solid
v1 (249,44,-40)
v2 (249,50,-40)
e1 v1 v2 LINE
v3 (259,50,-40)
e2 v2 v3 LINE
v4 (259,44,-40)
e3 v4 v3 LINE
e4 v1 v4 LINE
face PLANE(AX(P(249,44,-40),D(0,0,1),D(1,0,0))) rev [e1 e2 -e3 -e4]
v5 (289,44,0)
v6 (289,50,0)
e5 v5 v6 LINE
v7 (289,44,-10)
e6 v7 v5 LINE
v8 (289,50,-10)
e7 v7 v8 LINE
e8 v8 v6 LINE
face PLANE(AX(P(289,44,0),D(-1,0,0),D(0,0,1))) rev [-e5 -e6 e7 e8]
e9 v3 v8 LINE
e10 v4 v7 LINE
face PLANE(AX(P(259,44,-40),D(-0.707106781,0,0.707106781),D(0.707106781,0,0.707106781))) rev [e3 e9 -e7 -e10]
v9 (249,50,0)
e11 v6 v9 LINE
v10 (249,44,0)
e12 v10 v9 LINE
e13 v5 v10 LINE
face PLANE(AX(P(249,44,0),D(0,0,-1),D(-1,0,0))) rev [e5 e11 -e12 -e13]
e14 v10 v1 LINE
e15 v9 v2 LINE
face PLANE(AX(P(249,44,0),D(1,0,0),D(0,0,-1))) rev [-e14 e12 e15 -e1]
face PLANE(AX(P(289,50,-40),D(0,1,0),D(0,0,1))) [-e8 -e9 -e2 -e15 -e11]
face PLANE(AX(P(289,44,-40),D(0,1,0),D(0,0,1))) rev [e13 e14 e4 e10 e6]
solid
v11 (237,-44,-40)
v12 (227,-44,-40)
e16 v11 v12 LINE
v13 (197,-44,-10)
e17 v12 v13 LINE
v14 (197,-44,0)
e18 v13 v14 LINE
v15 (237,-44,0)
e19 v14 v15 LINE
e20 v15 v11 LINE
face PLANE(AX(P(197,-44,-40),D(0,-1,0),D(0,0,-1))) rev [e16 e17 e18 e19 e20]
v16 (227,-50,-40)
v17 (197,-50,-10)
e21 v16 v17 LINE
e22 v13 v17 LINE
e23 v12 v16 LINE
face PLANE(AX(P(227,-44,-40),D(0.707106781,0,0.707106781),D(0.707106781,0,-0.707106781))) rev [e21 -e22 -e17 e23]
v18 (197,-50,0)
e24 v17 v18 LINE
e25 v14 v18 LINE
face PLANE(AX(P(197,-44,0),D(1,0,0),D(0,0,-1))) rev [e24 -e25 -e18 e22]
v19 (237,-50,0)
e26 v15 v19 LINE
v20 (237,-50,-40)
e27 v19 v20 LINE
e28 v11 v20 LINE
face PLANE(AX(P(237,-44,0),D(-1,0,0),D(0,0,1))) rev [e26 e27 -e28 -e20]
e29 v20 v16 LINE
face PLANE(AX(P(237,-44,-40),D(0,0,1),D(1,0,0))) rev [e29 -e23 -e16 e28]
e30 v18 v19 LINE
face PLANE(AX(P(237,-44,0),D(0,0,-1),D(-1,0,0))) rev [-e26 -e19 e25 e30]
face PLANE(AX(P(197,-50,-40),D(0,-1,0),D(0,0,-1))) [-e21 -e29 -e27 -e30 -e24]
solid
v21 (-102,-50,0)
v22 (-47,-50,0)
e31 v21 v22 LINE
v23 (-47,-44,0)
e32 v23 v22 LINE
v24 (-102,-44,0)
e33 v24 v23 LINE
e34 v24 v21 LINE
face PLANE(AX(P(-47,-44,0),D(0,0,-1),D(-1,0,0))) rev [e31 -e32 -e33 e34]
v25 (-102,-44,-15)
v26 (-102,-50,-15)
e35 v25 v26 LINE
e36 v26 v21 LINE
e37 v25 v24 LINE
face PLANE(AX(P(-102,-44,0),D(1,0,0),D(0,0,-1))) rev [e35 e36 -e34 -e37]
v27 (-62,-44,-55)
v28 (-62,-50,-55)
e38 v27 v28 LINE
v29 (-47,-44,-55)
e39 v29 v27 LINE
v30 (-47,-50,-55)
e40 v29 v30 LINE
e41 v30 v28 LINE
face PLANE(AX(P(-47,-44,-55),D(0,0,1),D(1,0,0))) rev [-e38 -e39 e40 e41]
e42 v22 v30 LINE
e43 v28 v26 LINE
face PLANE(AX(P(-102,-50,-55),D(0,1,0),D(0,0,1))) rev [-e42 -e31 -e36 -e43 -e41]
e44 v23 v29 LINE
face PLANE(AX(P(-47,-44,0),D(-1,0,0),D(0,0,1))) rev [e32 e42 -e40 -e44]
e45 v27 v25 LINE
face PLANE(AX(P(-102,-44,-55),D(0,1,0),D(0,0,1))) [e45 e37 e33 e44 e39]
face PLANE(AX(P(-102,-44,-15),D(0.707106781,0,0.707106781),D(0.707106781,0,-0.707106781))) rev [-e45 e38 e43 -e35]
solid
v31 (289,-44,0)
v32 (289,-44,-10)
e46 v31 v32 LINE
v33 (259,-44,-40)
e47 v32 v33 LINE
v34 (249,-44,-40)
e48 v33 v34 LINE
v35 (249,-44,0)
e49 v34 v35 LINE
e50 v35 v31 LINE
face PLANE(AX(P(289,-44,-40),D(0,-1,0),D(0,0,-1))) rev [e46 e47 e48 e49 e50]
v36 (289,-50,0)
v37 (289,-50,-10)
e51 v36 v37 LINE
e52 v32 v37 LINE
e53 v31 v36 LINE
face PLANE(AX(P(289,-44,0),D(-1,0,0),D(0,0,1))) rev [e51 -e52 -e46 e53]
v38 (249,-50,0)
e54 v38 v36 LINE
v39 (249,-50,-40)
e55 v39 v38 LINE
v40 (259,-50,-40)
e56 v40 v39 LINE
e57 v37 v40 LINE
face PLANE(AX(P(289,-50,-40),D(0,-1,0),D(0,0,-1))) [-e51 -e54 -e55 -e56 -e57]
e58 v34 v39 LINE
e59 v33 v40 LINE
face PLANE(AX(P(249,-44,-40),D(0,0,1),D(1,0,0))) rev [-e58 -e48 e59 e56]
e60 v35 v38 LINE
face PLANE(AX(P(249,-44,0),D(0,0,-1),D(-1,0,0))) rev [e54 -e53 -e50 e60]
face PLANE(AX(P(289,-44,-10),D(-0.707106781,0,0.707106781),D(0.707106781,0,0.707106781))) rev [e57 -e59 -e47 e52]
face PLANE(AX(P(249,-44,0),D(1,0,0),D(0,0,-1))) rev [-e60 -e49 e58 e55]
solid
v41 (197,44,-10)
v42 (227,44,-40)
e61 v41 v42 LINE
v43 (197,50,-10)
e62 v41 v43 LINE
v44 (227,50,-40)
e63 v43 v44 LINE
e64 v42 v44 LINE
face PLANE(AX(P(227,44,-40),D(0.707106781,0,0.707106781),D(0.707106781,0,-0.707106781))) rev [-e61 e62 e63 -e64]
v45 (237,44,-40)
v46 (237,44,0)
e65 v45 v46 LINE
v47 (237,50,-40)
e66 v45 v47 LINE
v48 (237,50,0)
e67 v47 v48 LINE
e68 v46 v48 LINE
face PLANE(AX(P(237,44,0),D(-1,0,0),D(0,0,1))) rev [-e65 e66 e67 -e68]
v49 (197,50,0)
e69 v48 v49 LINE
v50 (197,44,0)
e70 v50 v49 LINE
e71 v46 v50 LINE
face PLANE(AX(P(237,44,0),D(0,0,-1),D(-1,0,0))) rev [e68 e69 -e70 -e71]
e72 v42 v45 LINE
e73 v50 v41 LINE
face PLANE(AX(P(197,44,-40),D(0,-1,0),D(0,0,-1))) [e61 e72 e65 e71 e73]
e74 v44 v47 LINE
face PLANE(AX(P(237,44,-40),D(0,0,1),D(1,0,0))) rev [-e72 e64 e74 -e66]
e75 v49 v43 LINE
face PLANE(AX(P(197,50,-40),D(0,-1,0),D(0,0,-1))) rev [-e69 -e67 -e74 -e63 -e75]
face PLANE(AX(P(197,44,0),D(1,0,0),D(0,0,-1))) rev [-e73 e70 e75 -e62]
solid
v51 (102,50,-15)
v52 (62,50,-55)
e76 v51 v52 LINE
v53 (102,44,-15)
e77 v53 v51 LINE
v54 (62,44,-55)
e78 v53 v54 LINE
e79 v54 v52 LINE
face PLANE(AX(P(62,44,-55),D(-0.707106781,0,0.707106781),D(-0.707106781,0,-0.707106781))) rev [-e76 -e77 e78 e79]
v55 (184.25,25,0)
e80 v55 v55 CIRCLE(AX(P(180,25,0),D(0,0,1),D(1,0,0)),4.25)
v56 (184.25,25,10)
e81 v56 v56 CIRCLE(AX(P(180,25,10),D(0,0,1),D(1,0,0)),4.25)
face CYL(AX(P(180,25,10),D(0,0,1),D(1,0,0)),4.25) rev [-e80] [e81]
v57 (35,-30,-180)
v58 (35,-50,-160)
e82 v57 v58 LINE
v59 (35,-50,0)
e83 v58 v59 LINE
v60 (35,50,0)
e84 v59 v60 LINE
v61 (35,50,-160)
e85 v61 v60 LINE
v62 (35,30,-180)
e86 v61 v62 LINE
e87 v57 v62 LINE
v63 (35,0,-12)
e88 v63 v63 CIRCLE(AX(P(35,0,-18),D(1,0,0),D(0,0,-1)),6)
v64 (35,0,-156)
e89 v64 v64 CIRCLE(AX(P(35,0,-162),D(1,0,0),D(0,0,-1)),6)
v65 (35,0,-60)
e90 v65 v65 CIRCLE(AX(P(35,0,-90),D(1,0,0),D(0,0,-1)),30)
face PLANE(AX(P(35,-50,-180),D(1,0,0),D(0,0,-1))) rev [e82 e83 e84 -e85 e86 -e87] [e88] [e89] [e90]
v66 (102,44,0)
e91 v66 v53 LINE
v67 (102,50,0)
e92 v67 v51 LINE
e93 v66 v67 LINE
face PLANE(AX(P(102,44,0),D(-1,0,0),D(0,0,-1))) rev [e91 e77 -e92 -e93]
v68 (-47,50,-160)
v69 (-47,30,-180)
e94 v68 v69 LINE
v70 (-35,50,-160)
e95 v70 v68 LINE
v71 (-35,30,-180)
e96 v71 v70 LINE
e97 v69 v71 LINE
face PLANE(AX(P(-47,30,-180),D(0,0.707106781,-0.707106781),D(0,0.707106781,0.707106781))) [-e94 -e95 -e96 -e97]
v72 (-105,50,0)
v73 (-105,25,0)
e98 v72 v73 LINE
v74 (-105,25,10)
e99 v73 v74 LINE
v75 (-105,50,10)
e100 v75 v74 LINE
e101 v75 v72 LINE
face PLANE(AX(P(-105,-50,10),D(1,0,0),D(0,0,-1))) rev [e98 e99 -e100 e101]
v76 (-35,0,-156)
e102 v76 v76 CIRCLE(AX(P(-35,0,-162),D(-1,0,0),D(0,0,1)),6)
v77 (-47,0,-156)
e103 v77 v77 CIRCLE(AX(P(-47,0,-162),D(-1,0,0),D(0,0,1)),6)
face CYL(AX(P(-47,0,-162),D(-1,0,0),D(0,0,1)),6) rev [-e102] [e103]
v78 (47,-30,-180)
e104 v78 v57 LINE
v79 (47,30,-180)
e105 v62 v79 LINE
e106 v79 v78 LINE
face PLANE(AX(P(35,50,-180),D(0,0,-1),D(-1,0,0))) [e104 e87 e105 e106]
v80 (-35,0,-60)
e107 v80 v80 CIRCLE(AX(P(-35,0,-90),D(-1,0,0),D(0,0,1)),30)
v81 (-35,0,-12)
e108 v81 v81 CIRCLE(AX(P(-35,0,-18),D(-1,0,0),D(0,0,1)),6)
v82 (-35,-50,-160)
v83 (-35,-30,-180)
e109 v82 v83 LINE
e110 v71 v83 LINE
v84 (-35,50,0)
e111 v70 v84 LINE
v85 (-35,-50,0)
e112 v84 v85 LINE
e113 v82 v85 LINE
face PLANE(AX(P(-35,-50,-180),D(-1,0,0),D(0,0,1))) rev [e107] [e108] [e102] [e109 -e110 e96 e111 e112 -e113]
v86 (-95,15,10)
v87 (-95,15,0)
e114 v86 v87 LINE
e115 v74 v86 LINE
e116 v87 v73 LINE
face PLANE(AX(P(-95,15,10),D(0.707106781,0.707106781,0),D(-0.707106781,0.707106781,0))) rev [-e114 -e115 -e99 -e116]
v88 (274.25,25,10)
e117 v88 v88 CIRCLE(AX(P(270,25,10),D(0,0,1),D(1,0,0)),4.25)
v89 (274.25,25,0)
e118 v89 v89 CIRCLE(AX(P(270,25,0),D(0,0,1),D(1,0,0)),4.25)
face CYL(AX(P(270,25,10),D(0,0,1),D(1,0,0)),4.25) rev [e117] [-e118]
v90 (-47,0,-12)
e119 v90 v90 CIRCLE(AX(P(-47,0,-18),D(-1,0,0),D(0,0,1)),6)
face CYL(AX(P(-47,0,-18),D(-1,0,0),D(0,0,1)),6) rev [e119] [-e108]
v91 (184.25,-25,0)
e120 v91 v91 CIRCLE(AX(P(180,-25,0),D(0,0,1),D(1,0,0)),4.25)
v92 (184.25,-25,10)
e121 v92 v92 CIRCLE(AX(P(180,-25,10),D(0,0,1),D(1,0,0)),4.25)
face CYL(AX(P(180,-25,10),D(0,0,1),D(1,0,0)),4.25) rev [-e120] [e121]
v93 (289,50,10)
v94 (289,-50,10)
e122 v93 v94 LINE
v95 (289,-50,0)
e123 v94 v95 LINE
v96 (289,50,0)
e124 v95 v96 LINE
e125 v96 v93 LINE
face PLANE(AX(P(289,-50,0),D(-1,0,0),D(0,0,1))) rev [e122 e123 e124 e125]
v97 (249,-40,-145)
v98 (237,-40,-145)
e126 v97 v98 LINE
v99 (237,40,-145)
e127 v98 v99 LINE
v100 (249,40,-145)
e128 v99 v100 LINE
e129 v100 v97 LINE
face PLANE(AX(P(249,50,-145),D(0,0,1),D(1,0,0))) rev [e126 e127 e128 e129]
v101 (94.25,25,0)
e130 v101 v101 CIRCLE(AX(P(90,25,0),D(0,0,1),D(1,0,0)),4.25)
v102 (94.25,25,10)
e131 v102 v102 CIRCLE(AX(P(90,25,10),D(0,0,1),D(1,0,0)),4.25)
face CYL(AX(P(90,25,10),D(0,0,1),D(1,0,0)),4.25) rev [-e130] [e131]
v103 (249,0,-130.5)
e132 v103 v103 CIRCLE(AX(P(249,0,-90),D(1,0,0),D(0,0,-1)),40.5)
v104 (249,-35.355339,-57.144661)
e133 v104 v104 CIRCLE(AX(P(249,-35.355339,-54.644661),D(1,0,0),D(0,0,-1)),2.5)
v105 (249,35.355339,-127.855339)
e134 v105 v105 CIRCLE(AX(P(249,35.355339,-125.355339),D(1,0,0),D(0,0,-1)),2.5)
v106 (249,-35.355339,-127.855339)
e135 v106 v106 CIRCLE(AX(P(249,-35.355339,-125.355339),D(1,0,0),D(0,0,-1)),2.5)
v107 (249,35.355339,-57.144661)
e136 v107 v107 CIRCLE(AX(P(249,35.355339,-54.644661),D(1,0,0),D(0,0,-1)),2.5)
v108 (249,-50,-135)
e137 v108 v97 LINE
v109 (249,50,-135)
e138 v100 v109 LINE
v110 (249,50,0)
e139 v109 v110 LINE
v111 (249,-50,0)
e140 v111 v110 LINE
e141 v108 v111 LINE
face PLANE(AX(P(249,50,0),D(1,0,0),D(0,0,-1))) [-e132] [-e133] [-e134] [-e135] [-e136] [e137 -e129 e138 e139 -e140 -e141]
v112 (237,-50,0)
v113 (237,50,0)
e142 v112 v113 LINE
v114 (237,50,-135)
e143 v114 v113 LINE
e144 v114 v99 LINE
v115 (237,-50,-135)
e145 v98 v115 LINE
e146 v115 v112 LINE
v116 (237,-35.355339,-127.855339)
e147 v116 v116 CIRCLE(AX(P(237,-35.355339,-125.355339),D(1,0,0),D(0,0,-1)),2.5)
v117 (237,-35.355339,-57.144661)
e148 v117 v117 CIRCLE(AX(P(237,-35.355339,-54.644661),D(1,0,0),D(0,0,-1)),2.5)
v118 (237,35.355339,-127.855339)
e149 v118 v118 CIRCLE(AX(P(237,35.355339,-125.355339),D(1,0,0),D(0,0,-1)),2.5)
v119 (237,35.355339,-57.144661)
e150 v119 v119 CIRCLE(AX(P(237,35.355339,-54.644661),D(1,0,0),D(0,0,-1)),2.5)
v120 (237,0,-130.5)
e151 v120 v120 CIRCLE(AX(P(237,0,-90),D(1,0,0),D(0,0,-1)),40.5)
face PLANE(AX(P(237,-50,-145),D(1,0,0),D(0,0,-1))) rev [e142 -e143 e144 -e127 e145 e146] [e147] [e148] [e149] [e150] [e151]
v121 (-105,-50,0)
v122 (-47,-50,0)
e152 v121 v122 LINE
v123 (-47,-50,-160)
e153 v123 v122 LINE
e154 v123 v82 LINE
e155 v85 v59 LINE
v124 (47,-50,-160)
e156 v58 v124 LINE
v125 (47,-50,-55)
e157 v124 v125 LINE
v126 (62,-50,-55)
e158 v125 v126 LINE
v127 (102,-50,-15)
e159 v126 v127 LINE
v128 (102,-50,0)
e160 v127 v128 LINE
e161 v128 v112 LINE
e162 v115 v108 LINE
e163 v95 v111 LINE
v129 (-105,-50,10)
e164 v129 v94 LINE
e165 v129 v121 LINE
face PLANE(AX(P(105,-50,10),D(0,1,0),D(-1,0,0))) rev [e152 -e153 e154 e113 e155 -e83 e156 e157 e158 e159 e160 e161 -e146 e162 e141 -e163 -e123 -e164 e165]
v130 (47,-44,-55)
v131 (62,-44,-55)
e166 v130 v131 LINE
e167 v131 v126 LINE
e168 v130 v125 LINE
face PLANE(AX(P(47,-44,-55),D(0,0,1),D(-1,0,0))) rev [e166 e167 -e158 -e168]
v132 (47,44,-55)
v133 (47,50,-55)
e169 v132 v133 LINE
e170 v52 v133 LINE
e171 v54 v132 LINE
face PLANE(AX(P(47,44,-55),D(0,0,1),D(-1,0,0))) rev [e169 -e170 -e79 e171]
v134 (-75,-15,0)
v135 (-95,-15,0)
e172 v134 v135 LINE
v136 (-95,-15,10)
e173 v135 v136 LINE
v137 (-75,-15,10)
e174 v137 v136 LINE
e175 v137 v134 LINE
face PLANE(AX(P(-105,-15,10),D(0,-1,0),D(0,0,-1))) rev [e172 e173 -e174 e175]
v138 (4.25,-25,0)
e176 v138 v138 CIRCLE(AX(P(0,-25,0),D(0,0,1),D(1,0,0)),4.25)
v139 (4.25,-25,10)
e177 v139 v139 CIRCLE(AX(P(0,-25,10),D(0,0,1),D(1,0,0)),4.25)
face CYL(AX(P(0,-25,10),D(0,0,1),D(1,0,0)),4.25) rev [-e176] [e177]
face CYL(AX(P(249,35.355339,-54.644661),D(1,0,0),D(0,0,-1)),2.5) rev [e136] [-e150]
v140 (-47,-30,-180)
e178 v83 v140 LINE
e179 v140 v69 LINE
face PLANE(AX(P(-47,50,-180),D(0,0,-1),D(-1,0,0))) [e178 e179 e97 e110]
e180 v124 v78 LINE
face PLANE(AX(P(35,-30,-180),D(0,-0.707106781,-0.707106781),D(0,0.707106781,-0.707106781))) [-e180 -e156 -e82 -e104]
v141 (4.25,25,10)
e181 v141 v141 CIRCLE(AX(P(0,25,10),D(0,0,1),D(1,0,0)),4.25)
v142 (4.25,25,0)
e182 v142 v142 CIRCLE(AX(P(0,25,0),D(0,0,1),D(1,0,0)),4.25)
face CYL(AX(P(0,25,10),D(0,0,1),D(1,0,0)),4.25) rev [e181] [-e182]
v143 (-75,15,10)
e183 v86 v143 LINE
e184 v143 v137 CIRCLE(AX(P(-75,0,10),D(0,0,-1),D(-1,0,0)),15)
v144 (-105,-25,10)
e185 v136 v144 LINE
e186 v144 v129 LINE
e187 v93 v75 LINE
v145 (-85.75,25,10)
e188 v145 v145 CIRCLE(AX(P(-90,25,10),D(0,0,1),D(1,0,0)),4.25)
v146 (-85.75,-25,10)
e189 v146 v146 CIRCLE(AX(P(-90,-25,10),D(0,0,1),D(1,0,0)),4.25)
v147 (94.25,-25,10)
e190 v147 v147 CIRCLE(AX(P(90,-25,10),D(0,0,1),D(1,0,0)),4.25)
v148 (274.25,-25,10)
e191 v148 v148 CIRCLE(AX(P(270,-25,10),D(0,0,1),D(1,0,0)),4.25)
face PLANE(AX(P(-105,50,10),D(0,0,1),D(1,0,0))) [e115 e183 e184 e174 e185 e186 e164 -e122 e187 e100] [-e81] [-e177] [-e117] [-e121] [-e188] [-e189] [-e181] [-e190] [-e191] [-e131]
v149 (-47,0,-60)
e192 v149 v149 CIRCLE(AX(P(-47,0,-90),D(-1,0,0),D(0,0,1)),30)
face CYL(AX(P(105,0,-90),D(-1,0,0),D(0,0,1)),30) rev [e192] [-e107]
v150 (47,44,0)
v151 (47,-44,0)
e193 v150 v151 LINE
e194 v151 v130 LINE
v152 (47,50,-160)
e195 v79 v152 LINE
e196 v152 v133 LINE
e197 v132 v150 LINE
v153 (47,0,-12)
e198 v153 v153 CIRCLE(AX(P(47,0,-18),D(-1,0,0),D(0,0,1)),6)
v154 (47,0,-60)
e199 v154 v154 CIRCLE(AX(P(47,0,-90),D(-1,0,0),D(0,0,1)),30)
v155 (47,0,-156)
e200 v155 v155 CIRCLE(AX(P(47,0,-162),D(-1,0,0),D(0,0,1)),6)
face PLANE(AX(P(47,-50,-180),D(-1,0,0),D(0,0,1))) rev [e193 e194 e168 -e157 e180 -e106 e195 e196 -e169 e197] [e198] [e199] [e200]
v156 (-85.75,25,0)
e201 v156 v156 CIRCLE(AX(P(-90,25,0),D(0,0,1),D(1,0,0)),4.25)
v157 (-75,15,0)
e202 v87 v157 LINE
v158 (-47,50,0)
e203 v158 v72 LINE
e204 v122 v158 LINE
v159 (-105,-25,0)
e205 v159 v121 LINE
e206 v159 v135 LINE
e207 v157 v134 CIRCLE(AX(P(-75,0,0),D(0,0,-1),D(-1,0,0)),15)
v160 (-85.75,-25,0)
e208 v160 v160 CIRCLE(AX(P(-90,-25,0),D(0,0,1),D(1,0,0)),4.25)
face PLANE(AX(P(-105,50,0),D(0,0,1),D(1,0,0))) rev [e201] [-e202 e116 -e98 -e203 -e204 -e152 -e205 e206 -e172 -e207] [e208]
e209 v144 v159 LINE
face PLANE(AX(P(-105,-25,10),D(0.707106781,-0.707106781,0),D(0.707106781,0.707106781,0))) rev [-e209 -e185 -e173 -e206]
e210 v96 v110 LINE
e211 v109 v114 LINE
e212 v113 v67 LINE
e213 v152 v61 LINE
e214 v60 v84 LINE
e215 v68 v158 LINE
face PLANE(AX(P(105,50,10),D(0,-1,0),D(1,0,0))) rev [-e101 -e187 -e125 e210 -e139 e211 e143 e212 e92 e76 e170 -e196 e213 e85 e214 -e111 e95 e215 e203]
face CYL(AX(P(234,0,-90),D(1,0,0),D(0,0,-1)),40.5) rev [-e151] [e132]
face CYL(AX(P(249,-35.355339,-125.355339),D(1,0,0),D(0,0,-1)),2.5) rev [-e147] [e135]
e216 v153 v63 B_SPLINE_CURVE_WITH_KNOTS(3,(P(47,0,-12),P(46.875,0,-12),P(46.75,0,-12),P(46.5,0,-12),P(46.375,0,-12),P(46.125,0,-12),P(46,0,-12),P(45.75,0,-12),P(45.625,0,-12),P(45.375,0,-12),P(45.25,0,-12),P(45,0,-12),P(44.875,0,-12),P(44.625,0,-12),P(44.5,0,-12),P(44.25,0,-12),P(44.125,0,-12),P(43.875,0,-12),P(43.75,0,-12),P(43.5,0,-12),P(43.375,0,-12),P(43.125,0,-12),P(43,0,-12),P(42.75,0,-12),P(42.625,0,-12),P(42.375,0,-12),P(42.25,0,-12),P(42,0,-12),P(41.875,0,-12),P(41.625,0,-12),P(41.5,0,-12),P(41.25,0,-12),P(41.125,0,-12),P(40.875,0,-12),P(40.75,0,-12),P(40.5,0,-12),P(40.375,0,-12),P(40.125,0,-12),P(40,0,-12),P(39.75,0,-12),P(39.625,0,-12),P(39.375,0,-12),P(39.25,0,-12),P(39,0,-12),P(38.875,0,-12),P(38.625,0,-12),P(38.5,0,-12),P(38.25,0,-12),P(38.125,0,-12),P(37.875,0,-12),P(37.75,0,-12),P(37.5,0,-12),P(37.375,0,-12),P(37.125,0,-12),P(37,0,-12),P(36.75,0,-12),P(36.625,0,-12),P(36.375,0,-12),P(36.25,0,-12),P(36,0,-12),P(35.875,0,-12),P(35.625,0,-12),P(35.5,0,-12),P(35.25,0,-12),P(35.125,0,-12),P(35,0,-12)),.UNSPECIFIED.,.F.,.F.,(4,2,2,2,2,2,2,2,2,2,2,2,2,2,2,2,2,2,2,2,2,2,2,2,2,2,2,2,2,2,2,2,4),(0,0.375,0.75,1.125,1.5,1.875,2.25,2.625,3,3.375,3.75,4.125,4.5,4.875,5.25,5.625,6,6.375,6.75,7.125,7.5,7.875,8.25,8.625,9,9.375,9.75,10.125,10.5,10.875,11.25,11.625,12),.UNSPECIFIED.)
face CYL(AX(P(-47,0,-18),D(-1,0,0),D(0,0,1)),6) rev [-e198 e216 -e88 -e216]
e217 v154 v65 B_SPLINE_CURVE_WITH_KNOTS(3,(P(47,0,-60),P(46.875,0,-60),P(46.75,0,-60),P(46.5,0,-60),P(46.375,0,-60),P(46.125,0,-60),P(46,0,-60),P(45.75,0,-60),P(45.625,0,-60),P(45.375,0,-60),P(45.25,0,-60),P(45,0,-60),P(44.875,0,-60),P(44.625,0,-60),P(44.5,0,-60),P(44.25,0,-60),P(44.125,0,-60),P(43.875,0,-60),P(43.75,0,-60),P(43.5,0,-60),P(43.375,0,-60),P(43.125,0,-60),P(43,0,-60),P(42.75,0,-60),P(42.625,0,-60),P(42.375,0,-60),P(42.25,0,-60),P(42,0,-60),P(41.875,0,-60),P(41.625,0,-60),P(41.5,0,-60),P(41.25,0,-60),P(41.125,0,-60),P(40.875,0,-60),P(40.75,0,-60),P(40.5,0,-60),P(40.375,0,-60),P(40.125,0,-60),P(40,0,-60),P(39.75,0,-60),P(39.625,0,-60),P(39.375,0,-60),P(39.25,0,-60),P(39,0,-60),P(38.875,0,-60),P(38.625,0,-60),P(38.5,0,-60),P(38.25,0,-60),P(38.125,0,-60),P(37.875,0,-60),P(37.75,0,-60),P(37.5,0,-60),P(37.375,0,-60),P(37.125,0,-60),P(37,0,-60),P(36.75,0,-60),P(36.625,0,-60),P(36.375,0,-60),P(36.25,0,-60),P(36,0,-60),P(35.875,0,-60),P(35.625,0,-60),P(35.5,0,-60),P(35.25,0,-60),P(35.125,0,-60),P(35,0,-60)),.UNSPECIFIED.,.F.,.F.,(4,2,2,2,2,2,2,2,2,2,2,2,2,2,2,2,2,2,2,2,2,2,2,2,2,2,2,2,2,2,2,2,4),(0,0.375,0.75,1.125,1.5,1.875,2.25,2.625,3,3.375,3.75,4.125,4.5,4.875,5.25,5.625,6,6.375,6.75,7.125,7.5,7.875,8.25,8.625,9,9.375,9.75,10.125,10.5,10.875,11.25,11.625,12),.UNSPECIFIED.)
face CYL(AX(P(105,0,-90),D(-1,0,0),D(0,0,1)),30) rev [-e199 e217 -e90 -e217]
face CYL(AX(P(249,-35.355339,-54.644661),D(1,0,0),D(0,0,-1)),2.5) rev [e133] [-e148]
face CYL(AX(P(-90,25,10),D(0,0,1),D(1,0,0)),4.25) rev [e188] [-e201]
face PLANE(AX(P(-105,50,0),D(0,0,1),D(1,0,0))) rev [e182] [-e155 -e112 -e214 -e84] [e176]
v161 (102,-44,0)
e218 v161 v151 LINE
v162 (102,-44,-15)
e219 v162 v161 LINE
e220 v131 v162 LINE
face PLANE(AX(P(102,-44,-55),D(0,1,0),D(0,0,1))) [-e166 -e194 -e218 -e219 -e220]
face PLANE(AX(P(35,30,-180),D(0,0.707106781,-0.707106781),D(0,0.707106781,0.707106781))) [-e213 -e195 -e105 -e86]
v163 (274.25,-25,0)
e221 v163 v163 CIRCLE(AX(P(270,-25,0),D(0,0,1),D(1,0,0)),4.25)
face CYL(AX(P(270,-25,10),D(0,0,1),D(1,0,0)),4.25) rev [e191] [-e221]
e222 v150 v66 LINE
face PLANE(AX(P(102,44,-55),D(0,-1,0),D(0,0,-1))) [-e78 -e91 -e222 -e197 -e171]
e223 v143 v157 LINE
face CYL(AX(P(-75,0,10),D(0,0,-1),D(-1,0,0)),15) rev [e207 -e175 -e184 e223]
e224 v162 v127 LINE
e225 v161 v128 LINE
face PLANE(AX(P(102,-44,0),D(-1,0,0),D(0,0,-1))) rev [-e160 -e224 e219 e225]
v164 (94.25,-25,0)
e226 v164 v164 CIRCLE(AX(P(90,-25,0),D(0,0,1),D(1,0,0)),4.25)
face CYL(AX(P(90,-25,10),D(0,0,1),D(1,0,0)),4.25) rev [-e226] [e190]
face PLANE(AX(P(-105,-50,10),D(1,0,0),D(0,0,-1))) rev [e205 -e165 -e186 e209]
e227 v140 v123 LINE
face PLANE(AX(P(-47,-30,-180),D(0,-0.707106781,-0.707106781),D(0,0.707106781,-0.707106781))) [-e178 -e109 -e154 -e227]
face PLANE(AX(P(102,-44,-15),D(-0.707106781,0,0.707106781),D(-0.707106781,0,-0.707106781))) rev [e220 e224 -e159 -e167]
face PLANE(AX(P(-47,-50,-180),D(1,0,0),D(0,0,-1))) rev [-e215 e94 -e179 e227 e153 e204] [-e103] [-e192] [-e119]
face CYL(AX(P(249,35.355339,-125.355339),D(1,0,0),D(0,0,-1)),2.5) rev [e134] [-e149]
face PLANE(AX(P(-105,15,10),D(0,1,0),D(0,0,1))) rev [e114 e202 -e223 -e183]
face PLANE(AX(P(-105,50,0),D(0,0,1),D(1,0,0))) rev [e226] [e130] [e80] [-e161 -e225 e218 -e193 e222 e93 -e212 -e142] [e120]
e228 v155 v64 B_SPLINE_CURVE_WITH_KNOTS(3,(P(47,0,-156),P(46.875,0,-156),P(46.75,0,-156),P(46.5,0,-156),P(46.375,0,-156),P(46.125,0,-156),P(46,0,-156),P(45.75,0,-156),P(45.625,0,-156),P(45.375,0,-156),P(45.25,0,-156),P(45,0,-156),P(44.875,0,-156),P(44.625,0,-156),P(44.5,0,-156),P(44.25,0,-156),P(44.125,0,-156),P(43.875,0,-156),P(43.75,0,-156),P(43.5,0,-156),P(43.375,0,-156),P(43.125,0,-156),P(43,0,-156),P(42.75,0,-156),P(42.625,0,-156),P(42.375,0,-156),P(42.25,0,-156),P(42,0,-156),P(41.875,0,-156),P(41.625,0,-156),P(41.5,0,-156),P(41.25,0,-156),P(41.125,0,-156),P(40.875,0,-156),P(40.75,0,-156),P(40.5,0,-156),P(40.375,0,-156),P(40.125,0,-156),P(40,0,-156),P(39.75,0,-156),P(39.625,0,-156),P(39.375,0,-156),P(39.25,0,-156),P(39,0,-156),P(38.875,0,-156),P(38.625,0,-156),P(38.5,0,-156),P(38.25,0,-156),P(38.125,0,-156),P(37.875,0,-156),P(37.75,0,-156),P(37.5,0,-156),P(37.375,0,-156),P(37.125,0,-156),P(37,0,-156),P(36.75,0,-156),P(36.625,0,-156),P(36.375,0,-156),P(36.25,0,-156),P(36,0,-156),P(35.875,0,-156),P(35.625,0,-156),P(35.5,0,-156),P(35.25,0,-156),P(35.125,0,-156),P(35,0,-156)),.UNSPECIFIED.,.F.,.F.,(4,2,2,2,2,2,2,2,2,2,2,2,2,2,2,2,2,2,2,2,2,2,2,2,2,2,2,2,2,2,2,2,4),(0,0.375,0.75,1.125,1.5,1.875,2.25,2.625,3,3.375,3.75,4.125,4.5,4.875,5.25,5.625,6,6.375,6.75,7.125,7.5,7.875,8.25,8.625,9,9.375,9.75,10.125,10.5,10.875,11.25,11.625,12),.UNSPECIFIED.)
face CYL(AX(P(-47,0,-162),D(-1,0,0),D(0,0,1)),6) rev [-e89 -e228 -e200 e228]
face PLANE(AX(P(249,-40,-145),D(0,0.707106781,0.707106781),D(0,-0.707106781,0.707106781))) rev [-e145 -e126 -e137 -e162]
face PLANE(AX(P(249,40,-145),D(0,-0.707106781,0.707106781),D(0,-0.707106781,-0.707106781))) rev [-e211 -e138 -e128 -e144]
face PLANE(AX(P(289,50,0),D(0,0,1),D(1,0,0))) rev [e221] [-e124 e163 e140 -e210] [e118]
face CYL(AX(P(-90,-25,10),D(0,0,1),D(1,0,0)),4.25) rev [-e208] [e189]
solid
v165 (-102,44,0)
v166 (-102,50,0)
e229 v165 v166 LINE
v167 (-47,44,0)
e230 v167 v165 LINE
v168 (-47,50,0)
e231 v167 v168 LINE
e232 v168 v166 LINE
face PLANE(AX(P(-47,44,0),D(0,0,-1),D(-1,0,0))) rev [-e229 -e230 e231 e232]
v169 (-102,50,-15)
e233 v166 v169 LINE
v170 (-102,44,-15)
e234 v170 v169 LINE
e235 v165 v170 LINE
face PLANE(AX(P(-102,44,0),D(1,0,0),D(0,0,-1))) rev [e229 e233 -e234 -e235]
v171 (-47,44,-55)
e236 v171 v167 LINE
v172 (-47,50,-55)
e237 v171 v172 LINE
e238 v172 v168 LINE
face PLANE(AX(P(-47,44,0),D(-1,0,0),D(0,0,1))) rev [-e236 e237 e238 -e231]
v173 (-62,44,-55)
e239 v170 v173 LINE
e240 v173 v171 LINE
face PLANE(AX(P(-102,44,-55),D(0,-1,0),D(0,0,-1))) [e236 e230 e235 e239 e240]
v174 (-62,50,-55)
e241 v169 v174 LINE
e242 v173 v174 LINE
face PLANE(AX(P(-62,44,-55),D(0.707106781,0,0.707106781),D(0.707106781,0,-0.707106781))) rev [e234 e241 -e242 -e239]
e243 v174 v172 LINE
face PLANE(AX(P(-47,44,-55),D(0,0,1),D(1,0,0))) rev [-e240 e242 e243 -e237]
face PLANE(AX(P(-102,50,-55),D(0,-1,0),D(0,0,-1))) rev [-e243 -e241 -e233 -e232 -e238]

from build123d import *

# Parameters (mm, degrees)
SKETCH_1_W                   = 210
SKETCH_1_H                   = 100
EXTRUDE_1_DEPTH              = 10
SKETCH_2_W                   = 12
SKETCH_2_H                   = 100
EXTRUDE_2_DEPTH              = 180
HOLE_WIZARD_M10_1_D          = 8.5
HOLE_WIZARD_M10_1_DEPTH      = 24.5
HOLE_WIZARD_M10_1_TIP        = 2.553657631
SKETCH_6_R                   = 30
CUT_EXTRUDE_1_DEPTH          = 241.840195981
HOLE_WIZARD_M14_1_D          = 12
GUSSET_START                 = -50
GUSSET_1_DEPTH               = 6
GUSSET_START_2               = 44
GUSSET_2_DEPTH               = 6
CHAMFER_1_SIZE               = 20
SKETCH_11_W                  = 144
SKETCH_11_H                  = 100
EXTRUDE_3_DEPTH              = 10
SKETCH_12_W                  = 12
SKETCH_12_H                  = 100
EXTRUDE_4_DEPTH              = 145
SKETCH_14_R                  = 40.5
CUT_EXTRUDE_2_DEPTH          = 15
HOLE_WIZARD_M6_1_AT_2_COUNT  = 2
HOLE_WIZARD_M6_1_AT_2_PITCH  = 70.710678119
HOLE_WIZARD_M6_1_AT_3_COUNT  = 2
HOLE_WIZARD_M6_1_AT_3_PITCH  = 100
HOLE_WIZARD_M6_1_AT_4_COUNT  = 2
HOLE_WIZARD_M6_1_AT_4_PITCH  = 70.710678119
CHAMFER_2_SIZE               = 10
GUSSET_3_DEPTH               = 6
GUSSET_4_DEPTH               = 6
SKETCH_22_W                  = 10
SKETCH_22_H                  = 100
EXTRUDE_5_DEPTH              = 40
HOLE_WIZARD_M10_2_AT_2_COUNT = 2
HOLE_WIZARD_M10_2_AT_2_PITCH = 50
HOLE_WIZARD_M10_2_AT_3_COUNT = 2
HOLE_WIZARD_M10_2_AT_3_PITCH = 90
HOLE_WIZARD_M10_2_AT_4_COUNT = 2
HOLE_WIZARD_M10_2_AT_4_PITCH = 102.95630141
GUSSET_5_DEPTH               = 6
GUSSET_6_DEPTH               = 6
CUT_EXTRUDE_3_DEPTH          = 345.123524334
CHAMFER_3_SIZE               = 10


# Read off the part's stored shape, not the designer's step: 角撑板1, 角撑板2, 角撑板3, 角撑板4, 角撑板5, 角撑板6
with BuildPart() as part:
    # 草图1 → 凸台-拉伸1 (new body)
    with BuildSketch(Plane.XY):
        Rectangle(SKETCH_1_W, SKETCH_1_H)
    extrude(amount=EXTRUDE_1_DEPTH)

    # 草图2 → 凸台-拉伸2 (add)
    with BuildSketch(Plane(origin=(0, 0, 0), x_dir=(-1, 0, 0), z_dir=(0, 0, -1))):
        with Locations((41, 0)):
            Rectangle(SKETCH_2_W, SKETCH_2_H)
        with Locations((-41, 0)):
            Rectangle(SKETCH_2_W, SKETCH_2_H)
    extrude(amount=EXTRUDE_2_DEPTH)

    # M10 螺纹孔1
    with Locations(Plane.XY.offset(10)):
        with Locations((90, -25), (90, 25), (-90, -25), (-90, 25), (0, -25), (0, 25)):
            Hole(HOLE_WIZARD_M10_1_D / 2, depth=HOLE_WIZARD_M10_1_DEPTH)
            with Locations((0, 0, -(HOLE_WIZARD_M10_1_DEPTH + HOLE_WIZARD_M10_1_TIP / 2))):  # 118° drill point
                Cone(0, HOLE_WIZARD_M10_1_D / 2, HOLE_WIZARD_M10_1_TIP, mode=Mode.SUBTRACT)

    # 草图6 → 切除-拉伸1 (cut, through all)
    with BuildSketch(Plane.ZY.offset(47)):
        with Locations((-90, 0)):
            Circle(SKETCH_6_R)
    extrude(amount=-CUT_EXTRUDE_1_DEPTH, mode=Mode.SUBTRACT)

    # M14 螺纹孔1 (through all)
    with Locations(Plane.ZY.offset(47)):
        with Locations((-162, 0), (-18, 0)):
            Hole(HOLE_WIZARD_M14_1_D / 2)


with BuildPart() as body_2:
    # Gusset 1 outline → Gusset 1 (new body)
    with BuildSketch(Plane(origin=(0, 0, 0), x_dir=(1, 0, 0), z_dir=(0, 1, 0)).offset(GUSSET_START)):
        Polygon((-102, 15), (-102, 0), (-47, 0), (-47, 55), (-62, 55), align=None)
    gusset_1 = extrude(amount=GUSSET_1_DEPTH)


with BuildPart() as body_3:
    # Gusset 2 outline → Gusset 2 (new body)
    with BuildSketch(Plane(origin=(0, 0, 0), x_dir=(1, 0, 0), z_dir=(0, 1, 0)).offset(GUSSET_START_2)):
        Polygon((-47, 55), (-62, 55), (-102, 15), (-102, 0), (-47, 0), align=None)
    gusset_2 = extrude(amount=GUSSET_2_DEPTH)


with BuildPart() as part_1:
    add(part.part)

    # 镜向1: Gusset 1, Gusset 2 across plane
    add(gusset_1.mirror(Plane(origin=(0, 0, 0), x_dir=(0, 0, 1), z_dir=(1, 0, 0))))
    add(gusset_2.mirror(Plane(origin=(0, 0, 0), x_dir=(0, 0, 1), z_dir=(1, 0, 0))))

    # 倒角1
    chamfer_1_edges = [part_1.edges().sort_by_distance(p)[0] for p in [
        (41, 50, -180),
        (41, -50, -180),
        (-41, 50, -180),
        (-41, -50, -180),
    ]]
    chamfer(chamfer_1_edges, length=CHAMFER_1_SIZE)

    # 草图11 → 凸台-拉伸3 (add)
    with BuildSketch(Plane.XY.offset(10)):
        with Locations((177, 0)):
            Rectangle(SKETCH_11_W, SKETCH_11_H)
    extrude(amount=-EXTRUDE_3_DEPTH)

    # 草图12 → 凸台-拉伸4 (add)
    with BuildSketch(Plane(origin=(0, 0, 0), x_dir=(-1, 0, 0), z_dir=(0, 0, -1))):
        with Locations((-243, 0)):
            Rectangle(SKETCH_12_W, SKETCH_12_H)
    extrude(amount=EXTRUDE_4_DEPTH)

    # 草图14 → 切除-拉伸2 (cut)
    with BuildSketch(Plane(origin=(249, 0, 0), x_dir=(0, 0, -1), z_dir=(1, 0, 0))):
        with Locations((90, 0)):
            Circle(SKETCH_14_R)
    extrude(amount=-CUT_EXTRUDE_2_DEPTH, mode=Mode.SUBTRACT)

    # 草图17 → M6 螺纹孔1 (revolve, cut)
    with BuildSketch(Plane(origin=(249, -35.355339059, -125.355339059), x_dir=(0, 0, -1), z_dir=(0, 1, 0))):
        Polygon((0, 0), (0, 16.502151548), (2.5, 15), (2.5, 0), align=None)
    hole_wizard_m6_1 = revolve(axis=Axis((255.35, -35.355339059, -125.355339059), (-1, 0, 0)), mode=Mode.SUBTRACT)

    # M6 螺纹孔1 at 2: M6 螺纹孔1 ×2
    with Locations(*[(0, i * HOLE_WIZARD_M6_1_AT_2_PITCH, 0) for i in range(1, HOLE_WIZARD_M6_1_AT_2_COUNT)]):
        add(hole_wizard_m6_1, mode=Mode.SUBTRACT)

    # M6 螺纹孔1 at 3: M6 螺纹孔1 ×2
    with Locations(*[Vector(0, 0.7071067811865512, 0.7071067811865439) * (i * HOLE_WIZARD_M6_1_AT_3_PITCH) for i in range(1, HOLE_WIZARD_M6_1_AT_3_COUNT)]):
        add(hole_wizard_m6_1, mode=Mode.SUBTRACT)

    # M6 螺纹孔1 at 4: M6 螺纹孔1 ×2
    with Locations(*[(0, 0, i * HOLE_WIZARD_M6_1_AT_4_PITCH) for i in range(1, HOLE_WIZARD_M6_1_AT_4_COUNT)]):
        add(hole_wizard_m6_1, mode=Mode.SUBTRACT)

    # 倒角2
    chamfer_2_edges = [part_1.edges().sort_by_distance(p)[0] for p in [
        (243, -50, -145),
        (243, 50, -145),
    ]]
    chamfer(chamfer_2_edges, length=CHAMFER_2_SIZE)

    # 草图22 → 凸台-拉伸5 (add)
    with BuildSketch(Plane(origin=(249, 0, 0), x_dir=(0, 0, -1), z_dir=(1, 0, 0))):
        with Locations((-5, 0)):
            Rectangle(SKETCH_22_W, SKETCH_22_H)
    extrude(amount=EXTRUDE_5_DEPTH)

    # 草图20 → M10 螺纹孔2 (revolve, cut)
    with BuildSketch(Plane(origin=(180, 25, 10), x_dir=(0, -1, 0), z_dir=(1, 0, 0))):
        Polygon((0, 0), (0, 27.053657631), (4.25, 24.5), (4.25, 0), align=None)
    hole_wizard_m10_2 = revolve(axis=Axis((180, 25, 16.35), (0, 0, -1)), mode=Mode.SUBTRACT)

    # M10 螺纹孔2 at 2: M10 螺纹孔2 ×2
    with Locations(*[(0, -i * HOLE_WIZARD_M10_2_AT_2_PITCH, 0) for i in range(1, HOLE_WIZARD_M10_2_AT_2_COUNT)]):
        add(hole_wizard_m10_2, mode=Mode.SUBTRACT)

    # M10 螺纹孔2 at 3: M10 螺纹孔2 ×2
    with Locations(*[(i * HOLE_WIZARD_M10_2_AT_3_PITCH, 0, 0) for i in range(1, HOLE_WIZARD_M10_2_AT_3_COUNT)]):
        add(hole_wizard_m10_2, mode=Mode.SUBTRACT)

    # M10 螺纹孔2 at 4: M10 螺纹孔2 ×2
    with Locations(*[Vector(0.8741572761215379, -0.48564293117863194, 0) * (i * HOLE_WIZARD_M10_2_AT_4_PITCH) for i in range(1, HOLE_WIZARD_M10_2_AT_4_COUNT)]):
        add(hole_wizard_m10_2, mode=Mode.SUBTRACT)

    # 草图25 → 切除-拉伸3 (cut, through all)
    with BuildSketch(Plane(origin=(0, 0, 0), x_dir=(-1, 0, 0), z_dir=(0, 0, -1))):
        with BuildLine():
            Line((105, -15), (75, -15))
            ThreePointArc((75, -15), (60, 0), (75, 15))
            Line((75, 15), (105, 15))
            ThreePointArc((105, 15), (120, 0), (105, -15))
        make_face()
    extrude(amount=-CUT_EXTRUDE_3_DEPTH, mode=Mode.SUBTRACT)

    # 倒角3
    chamfer_3_edges = [part_1.edges().sort_by_distance(p)[0] for p in [
        (-105, 15, 5),
        (-105, -15, 5),
    ]]
    chamfer(chamfer_3_edges, length=CHAMFER_3_SIZE)


with BuildPart() as body_4:
    # Gusset 3 outline → Gusset 3 (new body)
    with BuildSketch(Plane(origin=(0, 0, 0), x_dir=(1, 0, 0), z_dir=(0, 1, 0)).offset(GUSSET_START)):
        Polygon((237, 40), (227, 40), (197, 10), (197, 0), (237, 0), align=None)
    extrude(amount=GUSSET_3_DEPTH)


with BuildPart() as body_5:
    # Gusset 4 outline → Gusset 4 (new body)
    with BuildSketch(Plane(origin=(0, 0, 0), x_dir=(1, 0, 0), z_dir=(0, 1, 0)).offset(GUSSET_START_2)):
        Polygon((237, 40), (227, 40), (197, 10), (197, 0), (237, 0), align=None)
    extrude(amount=GUSSET_4_DEPTH)


with BuildPart() as body_6:
    # Gusset 5 outline → Gusset 5 (new body)
    with BuildSketch(Plane(origin=(0, 0, 0), x_dir=(1, 0, 0), z_dir=(0, 1, 0)).offset(GUSSET_START)):
        Polygon((289, 0), (289, 10), (259, 40), (249, 40), (249, 0), align=None)
    extrude(amount=GUSSET_5_DEPTH)


with BuildPart() as body_7:
    # Gusset 6 outline → Gusset 6 (new body)
    with BuildSketch(Plane(origin=(0, 0, 0), x_dir=(1, 0, 0), z_dir=(0, 1, 0)).offset(GUSSET_START_2)):
        Polygon((259, 40), (249, 40), (249, 0), (289, 0), (289, 10), align=None)
    extrude(amount=GUSSET_6_DEPTH)


solid = Compound([body_2.part, body_3.part, part_1.part, body_4.part, body_5.part, body_6.part, body_7.part])
